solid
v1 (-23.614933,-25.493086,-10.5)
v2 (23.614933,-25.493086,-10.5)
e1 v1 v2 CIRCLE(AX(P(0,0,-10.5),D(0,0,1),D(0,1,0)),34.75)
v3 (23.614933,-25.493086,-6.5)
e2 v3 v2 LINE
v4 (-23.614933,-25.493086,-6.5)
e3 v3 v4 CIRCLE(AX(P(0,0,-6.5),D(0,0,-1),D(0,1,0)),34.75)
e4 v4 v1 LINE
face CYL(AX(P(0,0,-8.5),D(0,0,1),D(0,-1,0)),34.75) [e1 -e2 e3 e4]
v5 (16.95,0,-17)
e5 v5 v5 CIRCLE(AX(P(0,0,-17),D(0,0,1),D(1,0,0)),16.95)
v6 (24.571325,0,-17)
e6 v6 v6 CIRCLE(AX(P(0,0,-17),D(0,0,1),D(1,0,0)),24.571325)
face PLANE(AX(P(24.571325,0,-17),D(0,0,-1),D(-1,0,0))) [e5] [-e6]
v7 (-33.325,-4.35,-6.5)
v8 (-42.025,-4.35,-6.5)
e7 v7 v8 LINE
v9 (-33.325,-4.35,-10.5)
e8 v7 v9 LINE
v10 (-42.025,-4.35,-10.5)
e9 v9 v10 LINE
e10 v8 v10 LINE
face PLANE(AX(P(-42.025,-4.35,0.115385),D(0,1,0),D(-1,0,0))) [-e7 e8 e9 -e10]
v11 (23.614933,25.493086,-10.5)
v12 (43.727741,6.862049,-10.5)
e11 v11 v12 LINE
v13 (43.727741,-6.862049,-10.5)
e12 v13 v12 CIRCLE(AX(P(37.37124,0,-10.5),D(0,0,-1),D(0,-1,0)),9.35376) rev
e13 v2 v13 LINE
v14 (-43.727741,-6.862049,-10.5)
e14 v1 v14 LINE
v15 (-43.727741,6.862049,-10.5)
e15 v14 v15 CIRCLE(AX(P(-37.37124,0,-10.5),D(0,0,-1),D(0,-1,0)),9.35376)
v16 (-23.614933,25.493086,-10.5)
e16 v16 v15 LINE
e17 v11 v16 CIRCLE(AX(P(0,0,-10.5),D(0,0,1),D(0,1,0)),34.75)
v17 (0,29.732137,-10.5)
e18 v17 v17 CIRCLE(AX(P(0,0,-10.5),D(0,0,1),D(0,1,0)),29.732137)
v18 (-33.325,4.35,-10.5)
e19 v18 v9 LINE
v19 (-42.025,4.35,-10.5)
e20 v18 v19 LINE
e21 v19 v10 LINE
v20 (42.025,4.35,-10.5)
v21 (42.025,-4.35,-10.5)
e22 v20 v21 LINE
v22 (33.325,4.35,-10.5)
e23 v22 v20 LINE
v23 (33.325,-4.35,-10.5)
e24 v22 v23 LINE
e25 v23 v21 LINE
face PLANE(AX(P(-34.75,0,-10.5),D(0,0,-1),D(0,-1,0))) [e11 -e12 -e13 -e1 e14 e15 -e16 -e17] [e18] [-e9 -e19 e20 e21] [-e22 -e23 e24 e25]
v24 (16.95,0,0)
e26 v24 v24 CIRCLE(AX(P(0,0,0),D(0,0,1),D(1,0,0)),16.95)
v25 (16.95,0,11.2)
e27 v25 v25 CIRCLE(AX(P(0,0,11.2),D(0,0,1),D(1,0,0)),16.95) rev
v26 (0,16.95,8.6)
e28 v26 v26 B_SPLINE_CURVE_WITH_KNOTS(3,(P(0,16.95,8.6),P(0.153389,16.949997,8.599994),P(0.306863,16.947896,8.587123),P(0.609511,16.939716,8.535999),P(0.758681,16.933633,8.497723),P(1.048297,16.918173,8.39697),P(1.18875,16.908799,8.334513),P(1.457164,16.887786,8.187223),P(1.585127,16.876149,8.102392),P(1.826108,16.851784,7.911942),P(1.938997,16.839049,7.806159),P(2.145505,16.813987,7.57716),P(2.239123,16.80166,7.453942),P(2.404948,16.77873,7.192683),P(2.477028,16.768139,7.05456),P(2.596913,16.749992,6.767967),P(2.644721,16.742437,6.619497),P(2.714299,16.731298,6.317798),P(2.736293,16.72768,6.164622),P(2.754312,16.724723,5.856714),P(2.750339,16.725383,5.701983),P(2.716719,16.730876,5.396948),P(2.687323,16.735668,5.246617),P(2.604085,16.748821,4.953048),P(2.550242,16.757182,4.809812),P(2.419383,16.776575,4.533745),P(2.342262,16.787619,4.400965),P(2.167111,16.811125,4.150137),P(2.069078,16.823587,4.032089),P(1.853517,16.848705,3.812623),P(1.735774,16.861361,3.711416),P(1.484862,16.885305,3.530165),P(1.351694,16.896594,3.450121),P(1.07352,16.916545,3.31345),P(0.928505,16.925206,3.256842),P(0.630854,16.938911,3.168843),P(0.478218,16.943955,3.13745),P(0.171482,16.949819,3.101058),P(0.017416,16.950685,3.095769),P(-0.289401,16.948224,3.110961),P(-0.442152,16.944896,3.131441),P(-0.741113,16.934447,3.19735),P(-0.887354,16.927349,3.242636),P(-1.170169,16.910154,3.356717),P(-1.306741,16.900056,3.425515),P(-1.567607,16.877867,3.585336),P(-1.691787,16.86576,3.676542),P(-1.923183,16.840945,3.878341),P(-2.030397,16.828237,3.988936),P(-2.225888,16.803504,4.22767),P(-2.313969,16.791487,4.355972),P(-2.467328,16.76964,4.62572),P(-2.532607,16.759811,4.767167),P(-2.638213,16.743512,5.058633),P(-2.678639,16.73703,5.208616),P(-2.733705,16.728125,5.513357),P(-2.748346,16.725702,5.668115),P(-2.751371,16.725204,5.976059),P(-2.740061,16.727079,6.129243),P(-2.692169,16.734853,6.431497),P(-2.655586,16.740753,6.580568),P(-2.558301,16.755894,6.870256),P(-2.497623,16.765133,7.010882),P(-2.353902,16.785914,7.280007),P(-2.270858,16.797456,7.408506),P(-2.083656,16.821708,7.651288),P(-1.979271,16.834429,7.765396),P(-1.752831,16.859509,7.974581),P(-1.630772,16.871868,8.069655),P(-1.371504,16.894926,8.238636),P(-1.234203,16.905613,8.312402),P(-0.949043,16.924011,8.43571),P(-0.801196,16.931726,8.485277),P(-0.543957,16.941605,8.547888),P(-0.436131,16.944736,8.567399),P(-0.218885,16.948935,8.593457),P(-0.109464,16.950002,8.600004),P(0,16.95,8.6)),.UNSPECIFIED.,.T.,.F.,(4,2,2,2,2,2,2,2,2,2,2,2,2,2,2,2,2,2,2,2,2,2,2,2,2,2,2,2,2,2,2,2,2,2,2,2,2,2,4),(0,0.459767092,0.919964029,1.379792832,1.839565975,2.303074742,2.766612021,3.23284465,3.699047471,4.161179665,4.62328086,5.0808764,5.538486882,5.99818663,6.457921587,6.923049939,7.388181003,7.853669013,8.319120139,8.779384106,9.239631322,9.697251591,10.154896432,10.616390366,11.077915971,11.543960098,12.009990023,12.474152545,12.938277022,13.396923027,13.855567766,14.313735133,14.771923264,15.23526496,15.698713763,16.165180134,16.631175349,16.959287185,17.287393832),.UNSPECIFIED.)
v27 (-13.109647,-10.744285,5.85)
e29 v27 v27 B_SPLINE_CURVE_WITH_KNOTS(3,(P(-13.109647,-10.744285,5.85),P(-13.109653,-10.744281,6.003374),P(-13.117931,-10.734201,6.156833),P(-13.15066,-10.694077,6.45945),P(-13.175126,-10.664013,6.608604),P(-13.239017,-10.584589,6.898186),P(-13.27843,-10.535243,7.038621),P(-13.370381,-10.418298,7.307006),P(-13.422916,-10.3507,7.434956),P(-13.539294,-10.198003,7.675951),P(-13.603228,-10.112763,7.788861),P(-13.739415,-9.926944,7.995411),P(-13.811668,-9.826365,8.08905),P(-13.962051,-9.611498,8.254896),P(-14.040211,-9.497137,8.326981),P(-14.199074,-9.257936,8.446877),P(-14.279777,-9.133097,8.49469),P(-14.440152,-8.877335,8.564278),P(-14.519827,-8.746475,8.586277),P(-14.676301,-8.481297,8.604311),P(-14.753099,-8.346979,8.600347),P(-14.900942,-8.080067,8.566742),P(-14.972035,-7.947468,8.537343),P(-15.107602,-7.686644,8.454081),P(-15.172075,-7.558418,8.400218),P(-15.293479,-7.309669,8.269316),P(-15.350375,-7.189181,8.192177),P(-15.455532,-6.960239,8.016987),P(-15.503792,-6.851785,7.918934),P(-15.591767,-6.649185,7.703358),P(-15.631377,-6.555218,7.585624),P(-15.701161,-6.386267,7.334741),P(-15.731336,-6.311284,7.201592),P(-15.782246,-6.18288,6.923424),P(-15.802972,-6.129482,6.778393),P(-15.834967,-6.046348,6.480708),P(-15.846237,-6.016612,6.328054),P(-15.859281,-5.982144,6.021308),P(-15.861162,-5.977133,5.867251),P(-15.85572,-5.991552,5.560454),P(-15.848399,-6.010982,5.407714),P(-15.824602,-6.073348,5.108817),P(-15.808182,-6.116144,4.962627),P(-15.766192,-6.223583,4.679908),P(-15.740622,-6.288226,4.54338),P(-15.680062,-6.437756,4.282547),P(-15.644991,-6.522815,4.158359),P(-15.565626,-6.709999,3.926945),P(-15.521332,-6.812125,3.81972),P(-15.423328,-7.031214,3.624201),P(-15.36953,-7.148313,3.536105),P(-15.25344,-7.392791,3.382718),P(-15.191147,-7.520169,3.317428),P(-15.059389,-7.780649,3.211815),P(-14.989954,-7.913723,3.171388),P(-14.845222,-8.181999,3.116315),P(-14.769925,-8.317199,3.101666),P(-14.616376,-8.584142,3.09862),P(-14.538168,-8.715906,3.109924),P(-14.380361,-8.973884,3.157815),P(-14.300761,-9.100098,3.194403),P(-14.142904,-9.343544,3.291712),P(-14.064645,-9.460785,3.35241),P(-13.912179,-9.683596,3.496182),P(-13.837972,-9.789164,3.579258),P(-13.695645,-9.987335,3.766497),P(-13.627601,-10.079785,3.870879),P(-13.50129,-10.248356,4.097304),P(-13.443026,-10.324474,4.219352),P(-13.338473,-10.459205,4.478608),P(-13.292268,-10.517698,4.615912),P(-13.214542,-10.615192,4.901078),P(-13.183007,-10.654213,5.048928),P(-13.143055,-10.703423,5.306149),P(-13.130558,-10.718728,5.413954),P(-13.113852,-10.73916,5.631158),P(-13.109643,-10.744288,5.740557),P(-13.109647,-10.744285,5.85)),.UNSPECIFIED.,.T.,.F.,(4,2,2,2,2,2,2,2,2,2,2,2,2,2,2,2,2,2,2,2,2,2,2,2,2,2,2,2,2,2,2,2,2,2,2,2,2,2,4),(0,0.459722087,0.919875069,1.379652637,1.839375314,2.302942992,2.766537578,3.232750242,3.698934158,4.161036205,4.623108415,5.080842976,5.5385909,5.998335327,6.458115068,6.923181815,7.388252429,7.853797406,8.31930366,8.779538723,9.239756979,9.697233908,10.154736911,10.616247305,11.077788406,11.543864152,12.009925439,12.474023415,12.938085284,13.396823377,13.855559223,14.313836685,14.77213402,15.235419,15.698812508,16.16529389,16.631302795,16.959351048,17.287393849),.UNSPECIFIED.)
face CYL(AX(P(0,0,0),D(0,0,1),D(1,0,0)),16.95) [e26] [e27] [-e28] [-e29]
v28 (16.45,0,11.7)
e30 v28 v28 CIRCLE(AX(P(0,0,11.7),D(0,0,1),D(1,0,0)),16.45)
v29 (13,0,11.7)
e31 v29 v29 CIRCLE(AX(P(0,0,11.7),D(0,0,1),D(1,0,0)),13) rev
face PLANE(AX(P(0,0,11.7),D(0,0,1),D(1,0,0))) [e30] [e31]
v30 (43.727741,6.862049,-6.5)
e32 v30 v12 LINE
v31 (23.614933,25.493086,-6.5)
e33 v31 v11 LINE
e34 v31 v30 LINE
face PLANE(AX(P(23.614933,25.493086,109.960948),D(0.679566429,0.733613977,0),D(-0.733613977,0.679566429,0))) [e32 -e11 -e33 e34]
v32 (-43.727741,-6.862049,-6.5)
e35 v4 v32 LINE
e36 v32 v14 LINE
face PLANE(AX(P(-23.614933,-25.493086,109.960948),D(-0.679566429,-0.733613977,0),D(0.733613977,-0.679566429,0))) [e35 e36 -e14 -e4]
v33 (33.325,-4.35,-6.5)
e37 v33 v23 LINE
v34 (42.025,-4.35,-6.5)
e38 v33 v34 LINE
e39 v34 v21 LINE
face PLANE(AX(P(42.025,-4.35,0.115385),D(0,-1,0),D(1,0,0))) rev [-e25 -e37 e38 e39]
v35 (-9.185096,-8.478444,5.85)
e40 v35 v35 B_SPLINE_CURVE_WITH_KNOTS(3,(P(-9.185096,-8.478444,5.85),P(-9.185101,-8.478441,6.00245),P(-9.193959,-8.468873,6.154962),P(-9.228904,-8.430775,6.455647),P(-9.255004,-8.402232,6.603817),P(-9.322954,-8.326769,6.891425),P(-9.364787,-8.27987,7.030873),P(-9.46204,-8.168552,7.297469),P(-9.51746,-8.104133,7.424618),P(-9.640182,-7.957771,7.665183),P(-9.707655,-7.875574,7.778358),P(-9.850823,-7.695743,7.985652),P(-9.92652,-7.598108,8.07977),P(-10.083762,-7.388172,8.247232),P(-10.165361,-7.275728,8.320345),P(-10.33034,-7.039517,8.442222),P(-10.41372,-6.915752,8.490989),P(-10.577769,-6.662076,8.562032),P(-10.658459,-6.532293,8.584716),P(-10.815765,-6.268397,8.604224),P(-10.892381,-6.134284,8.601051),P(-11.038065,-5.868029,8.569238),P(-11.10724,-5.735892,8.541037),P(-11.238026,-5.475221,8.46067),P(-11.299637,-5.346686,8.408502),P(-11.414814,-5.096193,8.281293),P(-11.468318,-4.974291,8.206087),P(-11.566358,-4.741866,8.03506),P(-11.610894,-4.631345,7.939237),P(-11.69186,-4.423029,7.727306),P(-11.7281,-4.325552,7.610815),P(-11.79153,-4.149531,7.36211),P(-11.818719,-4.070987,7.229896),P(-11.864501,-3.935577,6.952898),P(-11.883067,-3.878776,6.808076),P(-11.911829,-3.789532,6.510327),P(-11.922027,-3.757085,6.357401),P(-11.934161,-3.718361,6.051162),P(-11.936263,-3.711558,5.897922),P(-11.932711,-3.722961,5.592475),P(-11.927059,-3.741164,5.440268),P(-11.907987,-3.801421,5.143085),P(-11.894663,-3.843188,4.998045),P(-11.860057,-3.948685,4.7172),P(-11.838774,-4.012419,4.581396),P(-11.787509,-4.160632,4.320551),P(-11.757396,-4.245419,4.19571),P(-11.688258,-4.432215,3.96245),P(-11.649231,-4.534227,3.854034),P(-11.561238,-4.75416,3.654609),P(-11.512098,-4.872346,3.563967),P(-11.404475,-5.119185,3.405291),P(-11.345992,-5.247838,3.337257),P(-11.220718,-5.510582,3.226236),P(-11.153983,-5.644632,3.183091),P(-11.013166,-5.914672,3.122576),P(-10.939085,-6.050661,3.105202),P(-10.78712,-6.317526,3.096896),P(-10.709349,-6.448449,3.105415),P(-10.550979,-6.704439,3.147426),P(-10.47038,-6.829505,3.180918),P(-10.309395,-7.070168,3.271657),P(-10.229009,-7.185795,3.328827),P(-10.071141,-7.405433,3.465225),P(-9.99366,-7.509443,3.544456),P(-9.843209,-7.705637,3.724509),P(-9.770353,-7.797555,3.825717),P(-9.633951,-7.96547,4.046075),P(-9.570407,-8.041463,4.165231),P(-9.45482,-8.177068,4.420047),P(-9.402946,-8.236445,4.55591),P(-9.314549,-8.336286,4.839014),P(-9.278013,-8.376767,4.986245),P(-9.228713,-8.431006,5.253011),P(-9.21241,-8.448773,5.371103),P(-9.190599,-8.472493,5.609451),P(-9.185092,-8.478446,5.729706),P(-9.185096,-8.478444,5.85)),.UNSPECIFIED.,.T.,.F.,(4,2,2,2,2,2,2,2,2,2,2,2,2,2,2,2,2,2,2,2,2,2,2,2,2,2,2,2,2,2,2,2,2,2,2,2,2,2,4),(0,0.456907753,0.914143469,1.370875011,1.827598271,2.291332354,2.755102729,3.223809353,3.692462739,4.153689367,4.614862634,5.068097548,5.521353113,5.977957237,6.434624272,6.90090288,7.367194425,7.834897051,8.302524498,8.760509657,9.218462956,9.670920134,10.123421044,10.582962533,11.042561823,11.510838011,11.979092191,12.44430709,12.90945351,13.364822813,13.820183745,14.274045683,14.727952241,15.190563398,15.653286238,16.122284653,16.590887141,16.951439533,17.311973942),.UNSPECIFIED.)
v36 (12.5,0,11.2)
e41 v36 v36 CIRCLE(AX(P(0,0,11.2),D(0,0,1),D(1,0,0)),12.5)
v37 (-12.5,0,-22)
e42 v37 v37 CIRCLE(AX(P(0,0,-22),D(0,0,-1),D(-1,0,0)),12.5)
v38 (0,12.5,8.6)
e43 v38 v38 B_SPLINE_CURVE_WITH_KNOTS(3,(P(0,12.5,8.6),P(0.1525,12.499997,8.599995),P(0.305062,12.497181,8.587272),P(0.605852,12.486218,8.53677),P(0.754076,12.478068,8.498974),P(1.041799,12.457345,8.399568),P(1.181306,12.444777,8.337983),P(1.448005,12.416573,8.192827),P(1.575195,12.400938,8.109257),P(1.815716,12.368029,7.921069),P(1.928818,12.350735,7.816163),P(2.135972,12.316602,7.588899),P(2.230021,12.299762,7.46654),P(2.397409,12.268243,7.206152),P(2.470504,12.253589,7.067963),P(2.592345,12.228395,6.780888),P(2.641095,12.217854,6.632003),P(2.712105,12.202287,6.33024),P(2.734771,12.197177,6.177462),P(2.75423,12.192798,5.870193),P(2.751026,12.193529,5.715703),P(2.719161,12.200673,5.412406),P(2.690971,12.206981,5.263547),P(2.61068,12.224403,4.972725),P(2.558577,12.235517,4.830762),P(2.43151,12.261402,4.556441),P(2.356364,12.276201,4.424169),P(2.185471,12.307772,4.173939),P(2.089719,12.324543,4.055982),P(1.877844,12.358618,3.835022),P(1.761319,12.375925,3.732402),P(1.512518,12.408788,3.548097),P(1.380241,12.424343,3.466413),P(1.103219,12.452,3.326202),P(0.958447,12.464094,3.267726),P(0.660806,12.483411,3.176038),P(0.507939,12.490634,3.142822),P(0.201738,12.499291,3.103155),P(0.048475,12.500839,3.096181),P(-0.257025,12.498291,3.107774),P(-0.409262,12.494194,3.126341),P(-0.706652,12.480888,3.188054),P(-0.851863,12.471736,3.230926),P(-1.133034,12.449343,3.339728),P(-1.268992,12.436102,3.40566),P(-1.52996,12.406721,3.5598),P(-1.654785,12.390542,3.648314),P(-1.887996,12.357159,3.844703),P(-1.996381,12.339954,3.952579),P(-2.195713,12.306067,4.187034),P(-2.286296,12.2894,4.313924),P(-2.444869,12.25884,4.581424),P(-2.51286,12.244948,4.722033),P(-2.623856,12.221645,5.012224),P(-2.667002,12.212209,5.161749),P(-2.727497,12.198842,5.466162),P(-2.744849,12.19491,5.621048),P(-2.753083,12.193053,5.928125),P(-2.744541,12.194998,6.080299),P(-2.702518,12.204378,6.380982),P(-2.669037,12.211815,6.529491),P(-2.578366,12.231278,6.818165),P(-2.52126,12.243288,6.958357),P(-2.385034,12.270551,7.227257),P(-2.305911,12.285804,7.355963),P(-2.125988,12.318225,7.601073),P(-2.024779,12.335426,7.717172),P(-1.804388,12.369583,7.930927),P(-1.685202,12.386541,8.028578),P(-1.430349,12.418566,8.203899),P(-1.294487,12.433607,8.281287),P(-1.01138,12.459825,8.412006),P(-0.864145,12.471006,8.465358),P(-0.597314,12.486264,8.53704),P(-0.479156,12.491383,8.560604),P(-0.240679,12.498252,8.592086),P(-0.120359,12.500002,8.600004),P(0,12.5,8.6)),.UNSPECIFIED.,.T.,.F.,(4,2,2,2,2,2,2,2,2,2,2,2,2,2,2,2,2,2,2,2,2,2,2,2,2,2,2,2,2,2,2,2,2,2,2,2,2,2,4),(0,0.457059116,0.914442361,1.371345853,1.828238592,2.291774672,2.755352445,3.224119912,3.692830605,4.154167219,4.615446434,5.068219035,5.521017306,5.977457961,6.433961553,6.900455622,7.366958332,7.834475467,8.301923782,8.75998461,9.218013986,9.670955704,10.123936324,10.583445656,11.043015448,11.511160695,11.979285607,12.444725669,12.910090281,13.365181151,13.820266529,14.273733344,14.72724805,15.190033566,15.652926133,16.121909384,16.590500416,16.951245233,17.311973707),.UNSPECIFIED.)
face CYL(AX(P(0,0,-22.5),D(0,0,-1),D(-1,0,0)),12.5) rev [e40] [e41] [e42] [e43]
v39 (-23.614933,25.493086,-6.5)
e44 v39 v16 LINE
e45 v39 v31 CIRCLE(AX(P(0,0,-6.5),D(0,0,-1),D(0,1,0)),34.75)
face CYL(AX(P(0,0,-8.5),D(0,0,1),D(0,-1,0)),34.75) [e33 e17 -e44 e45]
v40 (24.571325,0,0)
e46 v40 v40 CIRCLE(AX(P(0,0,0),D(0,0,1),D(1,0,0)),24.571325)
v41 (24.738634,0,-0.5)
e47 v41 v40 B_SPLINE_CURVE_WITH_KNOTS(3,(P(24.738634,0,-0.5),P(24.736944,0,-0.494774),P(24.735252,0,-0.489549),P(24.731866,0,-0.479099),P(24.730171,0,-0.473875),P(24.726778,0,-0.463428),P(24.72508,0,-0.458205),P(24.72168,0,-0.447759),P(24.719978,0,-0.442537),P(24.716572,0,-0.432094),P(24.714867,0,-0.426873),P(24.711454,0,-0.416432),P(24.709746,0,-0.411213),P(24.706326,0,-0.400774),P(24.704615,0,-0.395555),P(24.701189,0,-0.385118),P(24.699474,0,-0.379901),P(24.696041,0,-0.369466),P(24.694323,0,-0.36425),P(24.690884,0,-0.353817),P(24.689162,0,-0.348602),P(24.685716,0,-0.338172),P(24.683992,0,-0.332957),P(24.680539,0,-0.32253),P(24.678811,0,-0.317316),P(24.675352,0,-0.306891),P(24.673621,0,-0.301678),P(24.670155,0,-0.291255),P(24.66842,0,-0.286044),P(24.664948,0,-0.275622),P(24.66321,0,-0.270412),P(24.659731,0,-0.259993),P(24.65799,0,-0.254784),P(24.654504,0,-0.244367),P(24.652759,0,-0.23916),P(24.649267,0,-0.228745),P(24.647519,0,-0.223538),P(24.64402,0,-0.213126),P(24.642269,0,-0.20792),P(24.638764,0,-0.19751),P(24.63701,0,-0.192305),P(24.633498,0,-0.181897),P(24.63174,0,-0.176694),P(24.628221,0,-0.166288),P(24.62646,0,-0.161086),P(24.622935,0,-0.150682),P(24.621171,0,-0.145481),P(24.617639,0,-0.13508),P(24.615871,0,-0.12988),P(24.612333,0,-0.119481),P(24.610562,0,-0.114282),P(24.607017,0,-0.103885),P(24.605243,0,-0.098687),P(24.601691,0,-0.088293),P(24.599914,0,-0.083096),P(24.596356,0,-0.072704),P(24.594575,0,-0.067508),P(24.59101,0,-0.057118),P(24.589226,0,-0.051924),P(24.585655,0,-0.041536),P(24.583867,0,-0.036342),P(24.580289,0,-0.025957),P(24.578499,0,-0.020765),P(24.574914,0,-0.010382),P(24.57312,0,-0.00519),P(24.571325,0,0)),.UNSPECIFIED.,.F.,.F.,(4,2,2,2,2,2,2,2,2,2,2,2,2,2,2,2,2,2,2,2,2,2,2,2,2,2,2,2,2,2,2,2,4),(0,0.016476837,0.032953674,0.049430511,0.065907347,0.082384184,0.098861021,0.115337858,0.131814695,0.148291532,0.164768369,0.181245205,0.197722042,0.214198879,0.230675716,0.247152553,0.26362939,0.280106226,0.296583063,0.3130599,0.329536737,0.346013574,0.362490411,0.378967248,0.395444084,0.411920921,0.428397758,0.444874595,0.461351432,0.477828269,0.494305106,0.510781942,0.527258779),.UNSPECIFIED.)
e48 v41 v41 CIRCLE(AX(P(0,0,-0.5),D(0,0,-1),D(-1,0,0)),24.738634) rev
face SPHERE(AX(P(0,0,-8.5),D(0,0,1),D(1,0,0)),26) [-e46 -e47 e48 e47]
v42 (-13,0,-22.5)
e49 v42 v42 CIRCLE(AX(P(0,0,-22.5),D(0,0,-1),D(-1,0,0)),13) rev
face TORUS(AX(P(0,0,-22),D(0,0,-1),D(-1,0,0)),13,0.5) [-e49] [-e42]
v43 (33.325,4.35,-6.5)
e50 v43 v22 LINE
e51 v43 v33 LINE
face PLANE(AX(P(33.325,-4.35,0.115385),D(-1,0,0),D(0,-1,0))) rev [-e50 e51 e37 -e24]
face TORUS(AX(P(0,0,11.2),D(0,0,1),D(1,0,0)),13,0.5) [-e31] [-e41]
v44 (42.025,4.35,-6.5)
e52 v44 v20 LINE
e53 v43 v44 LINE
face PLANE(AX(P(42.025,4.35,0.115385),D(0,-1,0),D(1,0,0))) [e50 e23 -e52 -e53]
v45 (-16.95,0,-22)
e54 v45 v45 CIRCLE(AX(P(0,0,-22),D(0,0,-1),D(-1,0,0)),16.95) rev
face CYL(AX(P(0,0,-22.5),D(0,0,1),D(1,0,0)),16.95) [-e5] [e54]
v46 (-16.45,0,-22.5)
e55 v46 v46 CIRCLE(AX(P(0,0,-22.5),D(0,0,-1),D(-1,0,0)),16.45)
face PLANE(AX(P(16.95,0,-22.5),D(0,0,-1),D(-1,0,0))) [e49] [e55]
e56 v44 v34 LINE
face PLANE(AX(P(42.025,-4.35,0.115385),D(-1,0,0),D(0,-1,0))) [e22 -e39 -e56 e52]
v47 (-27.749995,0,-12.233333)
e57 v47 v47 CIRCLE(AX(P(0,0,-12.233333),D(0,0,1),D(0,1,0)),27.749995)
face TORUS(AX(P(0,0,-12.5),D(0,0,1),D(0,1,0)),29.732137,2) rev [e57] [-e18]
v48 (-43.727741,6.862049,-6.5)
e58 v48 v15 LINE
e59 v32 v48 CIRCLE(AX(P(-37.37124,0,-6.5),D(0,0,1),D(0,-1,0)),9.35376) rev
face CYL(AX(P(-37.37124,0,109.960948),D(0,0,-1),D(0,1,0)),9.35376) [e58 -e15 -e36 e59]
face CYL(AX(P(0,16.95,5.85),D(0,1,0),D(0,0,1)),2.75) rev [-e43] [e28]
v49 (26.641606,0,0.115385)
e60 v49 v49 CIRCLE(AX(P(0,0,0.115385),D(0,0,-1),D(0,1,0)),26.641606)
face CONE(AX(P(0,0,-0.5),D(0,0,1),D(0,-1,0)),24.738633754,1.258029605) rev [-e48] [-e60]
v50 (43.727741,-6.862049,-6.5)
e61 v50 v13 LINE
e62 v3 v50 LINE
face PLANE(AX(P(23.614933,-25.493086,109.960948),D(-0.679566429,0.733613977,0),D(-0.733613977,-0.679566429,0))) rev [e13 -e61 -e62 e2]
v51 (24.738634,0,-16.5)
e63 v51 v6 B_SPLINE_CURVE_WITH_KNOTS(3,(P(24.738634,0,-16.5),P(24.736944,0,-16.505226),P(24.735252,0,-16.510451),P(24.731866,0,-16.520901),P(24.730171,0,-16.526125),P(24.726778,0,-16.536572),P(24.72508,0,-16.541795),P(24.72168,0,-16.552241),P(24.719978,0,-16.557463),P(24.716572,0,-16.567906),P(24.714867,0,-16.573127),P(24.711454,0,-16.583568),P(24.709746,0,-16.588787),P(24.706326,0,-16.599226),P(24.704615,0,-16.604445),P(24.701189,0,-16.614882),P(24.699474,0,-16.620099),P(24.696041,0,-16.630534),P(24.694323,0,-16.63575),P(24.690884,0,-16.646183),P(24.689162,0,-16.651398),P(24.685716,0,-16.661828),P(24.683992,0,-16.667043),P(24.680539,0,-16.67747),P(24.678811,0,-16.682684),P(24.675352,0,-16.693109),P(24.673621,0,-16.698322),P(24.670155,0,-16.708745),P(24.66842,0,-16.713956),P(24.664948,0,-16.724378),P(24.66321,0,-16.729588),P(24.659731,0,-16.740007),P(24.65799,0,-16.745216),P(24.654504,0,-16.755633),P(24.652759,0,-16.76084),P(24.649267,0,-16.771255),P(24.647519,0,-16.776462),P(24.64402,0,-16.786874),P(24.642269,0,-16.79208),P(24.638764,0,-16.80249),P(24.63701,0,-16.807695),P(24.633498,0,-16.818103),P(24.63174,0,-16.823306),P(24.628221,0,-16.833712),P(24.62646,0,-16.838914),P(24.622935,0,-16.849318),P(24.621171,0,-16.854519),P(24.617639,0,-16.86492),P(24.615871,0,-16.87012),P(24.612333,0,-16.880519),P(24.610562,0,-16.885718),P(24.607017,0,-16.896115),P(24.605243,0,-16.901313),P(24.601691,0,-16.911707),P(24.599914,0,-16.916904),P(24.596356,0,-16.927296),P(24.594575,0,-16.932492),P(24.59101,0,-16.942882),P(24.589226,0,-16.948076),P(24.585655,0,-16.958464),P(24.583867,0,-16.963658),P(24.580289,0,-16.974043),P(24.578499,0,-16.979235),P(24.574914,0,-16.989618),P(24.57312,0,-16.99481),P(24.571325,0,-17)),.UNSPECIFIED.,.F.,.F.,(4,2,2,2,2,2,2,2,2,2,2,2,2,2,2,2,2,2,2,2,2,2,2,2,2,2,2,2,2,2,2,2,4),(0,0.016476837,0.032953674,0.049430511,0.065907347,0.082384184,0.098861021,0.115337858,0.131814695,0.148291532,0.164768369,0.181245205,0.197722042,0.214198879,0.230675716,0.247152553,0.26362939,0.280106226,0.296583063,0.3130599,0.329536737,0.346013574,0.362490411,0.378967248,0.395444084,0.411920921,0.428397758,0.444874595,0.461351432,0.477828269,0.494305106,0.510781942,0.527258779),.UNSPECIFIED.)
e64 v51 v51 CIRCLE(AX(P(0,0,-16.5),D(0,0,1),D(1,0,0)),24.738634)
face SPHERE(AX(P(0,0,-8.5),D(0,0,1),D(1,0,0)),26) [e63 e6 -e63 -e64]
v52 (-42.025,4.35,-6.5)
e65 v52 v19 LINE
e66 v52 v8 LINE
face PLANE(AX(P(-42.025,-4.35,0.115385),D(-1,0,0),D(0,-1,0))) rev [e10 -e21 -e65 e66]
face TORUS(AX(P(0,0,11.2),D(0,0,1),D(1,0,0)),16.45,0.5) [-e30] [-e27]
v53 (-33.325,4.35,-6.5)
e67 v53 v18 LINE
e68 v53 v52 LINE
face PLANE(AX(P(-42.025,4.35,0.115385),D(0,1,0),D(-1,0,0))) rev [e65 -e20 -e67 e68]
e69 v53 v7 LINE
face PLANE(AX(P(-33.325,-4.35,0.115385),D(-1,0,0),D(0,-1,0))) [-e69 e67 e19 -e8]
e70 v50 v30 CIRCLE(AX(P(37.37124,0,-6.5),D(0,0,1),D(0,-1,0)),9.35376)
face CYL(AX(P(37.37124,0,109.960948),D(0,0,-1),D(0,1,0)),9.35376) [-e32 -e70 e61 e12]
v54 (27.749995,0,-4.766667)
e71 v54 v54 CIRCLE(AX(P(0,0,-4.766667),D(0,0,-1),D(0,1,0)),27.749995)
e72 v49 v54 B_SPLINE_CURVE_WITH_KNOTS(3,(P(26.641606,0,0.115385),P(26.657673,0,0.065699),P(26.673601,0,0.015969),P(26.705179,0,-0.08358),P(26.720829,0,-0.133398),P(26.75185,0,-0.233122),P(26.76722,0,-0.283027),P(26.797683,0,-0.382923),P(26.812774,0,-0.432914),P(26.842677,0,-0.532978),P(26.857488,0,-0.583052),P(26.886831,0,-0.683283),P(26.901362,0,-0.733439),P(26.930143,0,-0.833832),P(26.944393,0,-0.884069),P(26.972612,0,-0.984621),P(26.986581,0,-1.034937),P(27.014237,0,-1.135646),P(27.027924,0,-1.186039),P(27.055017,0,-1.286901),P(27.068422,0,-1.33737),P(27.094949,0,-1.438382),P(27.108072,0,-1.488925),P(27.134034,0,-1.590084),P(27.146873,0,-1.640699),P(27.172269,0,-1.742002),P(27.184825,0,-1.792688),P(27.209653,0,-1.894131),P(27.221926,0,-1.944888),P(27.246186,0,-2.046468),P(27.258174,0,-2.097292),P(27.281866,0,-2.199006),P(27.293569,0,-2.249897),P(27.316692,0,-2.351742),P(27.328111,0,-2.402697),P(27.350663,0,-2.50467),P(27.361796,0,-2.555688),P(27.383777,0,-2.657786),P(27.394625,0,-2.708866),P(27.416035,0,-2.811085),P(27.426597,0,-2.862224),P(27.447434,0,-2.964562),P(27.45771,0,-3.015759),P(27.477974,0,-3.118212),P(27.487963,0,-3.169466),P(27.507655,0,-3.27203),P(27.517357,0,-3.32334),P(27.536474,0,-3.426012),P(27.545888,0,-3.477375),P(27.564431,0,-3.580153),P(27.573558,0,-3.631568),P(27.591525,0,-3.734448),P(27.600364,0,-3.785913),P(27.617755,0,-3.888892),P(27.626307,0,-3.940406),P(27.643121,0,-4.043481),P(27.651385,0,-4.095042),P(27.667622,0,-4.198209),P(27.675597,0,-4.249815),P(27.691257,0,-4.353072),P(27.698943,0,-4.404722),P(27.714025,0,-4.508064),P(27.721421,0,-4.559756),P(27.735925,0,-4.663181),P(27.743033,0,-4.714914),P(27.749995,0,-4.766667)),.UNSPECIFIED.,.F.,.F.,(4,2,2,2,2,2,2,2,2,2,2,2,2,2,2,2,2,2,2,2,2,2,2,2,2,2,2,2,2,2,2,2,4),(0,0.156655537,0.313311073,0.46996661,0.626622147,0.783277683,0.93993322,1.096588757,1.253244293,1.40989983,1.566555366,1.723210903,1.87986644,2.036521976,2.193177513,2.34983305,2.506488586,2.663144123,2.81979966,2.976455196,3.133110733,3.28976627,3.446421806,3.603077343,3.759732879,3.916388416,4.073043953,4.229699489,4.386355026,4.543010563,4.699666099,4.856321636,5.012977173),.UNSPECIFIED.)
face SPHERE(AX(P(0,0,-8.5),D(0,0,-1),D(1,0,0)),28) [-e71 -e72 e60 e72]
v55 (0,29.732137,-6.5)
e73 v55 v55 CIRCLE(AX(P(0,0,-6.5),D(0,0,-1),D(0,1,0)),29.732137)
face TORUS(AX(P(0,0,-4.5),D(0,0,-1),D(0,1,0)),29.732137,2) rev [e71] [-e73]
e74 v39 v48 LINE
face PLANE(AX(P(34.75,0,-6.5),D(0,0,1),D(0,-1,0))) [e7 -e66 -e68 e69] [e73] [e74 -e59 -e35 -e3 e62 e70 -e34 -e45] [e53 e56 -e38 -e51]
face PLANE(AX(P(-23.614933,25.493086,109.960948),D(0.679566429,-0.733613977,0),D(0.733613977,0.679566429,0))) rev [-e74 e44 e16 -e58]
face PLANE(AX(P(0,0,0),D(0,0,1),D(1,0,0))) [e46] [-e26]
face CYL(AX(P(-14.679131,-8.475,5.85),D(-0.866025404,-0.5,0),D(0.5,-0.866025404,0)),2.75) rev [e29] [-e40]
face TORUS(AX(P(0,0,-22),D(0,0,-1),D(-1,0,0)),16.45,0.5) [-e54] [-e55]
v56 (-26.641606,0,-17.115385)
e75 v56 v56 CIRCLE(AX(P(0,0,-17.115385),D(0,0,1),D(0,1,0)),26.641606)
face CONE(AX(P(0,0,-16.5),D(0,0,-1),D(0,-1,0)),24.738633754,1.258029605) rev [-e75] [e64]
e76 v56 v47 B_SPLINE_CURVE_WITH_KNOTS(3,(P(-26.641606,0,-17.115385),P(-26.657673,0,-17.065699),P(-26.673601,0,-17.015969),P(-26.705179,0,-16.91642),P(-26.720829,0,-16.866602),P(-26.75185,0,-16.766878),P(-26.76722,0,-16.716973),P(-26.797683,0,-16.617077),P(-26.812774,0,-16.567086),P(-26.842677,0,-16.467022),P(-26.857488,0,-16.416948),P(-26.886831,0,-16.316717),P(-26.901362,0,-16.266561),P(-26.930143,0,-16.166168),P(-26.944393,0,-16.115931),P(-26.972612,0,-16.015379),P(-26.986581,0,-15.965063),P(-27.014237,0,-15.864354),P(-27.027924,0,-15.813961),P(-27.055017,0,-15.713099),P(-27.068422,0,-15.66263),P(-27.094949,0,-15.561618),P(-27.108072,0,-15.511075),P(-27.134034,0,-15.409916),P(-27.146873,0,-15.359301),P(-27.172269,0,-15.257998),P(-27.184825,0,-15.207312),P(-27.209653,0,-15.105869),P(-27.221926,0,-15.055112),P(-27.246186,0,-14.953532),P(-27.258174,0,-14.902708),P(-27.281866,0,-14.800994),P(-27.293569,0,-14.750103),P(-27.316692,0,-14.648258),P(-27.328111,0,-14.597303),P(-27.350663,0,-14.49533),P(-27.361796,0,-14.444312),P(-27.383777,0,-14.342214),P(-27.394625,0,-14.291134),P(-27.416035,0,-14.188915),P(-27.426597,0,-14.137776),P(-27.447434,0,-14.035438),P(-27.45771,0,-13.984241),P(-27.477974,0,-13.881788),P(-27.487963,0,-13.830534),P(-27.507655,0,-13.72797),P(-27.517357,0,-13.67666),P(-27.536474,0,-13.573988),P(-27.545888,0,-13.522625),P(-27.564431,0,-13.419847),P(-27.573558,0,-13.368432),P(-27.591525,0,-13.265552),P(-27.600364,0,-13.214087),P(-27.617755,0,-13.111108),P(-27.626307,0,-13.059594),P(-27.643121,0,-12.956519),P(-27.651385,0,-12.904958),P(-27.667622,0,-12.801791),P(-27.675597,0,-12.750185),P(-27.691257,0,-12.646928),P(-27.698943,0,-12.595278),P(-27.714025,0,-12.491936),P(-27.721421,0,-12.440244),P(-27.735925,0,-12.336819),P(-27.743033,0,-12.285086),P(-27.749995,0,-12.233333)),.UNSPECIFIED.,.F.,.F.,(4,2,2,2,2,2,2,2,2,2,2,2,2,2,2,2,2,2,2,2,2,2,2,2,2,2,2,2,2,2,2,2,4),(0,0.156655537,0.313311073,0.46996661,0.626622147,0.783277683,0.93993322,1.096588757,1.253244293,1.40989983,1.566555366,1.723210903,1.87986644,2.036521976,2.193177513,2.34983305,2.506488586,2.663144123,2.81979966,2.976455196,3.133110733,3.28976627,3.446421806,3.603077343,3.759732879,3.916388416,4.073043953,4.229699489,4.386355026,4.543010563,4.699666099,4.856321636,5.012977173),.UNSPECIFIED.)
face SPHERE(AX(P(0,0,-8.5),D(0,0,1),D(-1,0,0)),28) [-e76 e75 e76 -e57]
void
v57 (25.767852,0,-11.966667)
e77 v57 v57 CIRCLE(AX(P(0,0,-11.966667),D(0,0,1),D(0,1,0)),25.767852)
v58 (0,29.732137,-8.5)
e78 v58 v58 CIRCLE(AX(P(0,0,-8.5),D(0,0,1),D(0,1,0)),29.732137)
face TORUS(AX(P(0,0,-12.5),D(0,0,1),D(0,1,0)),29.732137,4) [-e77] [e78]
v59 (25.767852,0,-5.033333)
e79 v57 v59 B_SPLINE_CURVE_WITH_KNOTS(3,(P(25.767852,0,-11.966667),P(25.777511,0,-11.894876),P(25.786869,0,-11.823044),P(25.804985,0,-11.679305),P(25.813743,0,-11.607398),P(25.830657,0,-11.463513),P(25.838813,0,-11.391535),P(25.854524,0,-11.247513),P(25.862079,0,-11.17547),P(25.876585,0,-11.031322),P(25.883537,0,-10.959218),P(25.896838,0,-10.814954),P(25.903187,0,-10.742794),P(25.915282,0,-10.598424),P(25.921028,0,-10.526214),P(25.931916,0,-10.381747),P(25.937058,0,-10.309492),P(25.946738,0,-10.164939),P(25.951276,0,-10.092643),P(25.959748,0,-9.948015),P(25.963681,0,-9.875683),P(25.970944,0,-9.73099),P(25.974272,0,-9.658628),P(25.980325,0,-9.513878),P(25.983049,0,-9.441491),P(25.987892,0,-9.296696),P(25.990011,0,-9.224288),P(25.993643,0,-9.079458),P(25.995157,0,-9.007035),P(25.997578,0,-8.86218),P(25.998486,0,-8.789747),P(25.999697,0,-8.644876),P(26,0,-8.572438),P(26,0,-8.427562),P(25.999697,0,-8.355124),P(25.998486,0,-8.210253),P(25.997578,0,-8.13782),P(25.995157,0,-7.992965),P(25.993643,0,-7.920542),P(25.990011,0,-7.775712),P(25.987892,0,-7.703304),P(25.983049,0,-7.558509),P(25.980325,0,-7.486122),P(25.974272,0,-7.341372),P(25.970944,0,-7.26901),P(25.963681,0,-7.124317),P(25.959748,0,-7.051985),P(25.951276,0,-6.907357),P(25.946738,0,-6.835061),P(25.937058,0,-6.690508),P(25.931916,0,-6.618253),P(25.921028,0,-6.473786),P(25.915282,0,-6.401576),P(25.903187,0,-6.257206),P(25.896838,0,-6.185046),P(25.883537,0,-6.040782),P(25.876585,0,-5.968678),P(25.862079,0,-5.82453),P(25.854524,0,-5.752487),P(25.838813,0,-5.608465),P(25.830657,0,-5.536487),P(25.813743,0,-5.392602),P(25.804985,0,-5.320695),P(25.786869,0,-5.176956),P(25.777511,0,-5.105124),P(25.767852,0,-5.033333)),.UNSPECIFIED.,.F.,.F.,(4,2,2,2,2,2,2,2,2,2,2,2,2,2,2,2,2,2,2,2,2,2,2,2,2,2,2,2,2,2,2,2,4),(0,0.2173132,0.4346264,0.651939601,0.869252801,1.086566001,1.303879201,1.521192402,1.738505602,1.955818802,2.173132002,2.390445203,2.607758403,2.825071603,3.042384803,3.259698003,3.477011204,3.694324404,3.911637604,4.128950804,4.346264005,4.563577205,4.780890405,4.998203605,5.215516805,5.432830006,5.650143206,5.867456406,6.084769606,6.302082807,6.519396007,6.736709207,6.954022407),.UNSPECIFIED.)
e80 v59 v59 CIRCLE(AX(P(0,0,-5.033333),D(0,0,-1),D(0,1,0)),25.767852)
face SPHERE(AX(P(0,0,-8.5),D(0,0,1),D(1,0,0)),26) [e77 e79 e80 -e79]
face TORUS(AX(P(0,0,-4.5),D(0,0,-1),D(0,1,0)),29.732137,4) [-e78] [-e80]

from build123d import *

# Parameters (mm, degrees)
SKETCH_2_W                   = 16.95
SKETCH_2_H                   = 5.5
SKETCH_3_W                   = 16.95
SKETCH_3_H                   = 11.7
HOLE_WIZARD_25_0_25_1_D      = 25
HOLE_WIZARD_5_5_5_5_1_REACH  = 62.391
HOLE_WIZARD_5_5_5_5_1_BORE_R = 2.75
HOLE_WIZARD_5_5_5_5_2_REACH  = 59.658
HOLE_WIZARD_5_5_5_5_2_BORE_R = 2.75
FILLET_1_R                   = 0.5
COMBINE_START                = -10.5
COMBINE_1_2_OUTLINE_W        = 8.7
COMBINE_1_2_OUTLINE_H        = 8.7
COMBINE_1_2_OUTLINE_R        = 29.732137495
COMBINE_1_2_DEPTH            = 4


with BuildPart() as part:
    # Эскиз1 → Повернуть1 (revolve)
    with BuildSketch(Plane(origin=(0, 0, 0), x_dir=(1, 0, 0), z_dir=(0, 1, 0))):
        with BuildLine():
            Line((24.571324751, 17), (0, 17))
            Line((0, 17), (0, 0))
            Line((0, 0), (24.571324751, 0))
            ThreePointArc((24.571324751, 0), (26, 8.5), (24.571324751, 17))
        make_face()
    revolve(axis=Axis((0, 0, -17), (0, 0, 1)))

    # Эскиз2 → Повернуть2 (revolve)
    with BuildSketch(Plane(origin=(0, 0, 0), x_dir=(1, 0, 0), z_dir=(0, 1, 0))):
        with Locations((8.475, 19.75)):
            Rectangle(SKETCH_2_W, SKETCH_2_H)
    revolve(axis=Axis((0, 0, -22.5), (0, 0, 1)))

    # Эскиз3 → Повернуть3 (revolve)
    with BuildSketch(Plane(origin=(0, 0, 0), x_dir=(1, 0, 0), z_dir=(0, 1, 0))):
        with Locations((8.475, -5.85)):
            Rectangle(SKETCH_3_W, SKETCH_3_H)
    revolve(axis=Axis((0, 0, 0), (0, 0, 1)))

    # Диаметр отверстия Ø25.0 (25)1 (through all)
    with Locations(Plane(origin=(0, 0, -22.5), x_dir=(-1, 0, 0), z_dir=(0, 0, -1))):
        with Locations((0, 0)):
            Hole(HOLE_WIZARD_25_0_25_1_D / 2)

    # Диаметр отверстия Ø5.5 (5.5)1 bore (on position points) → Диаметр отверстия Ø5.5 (5.5)1 (cut, up to next)
    with BuildSketch(Plane(origin=(-14.679130594, -8.475, 5.85), x_dir=(0.5, -0.866025403784, 0), z_dir=(-0.866025403784, -0.5, 0)), mode=Mode.PRIVATE) as hole_wizard_5_5_5_5_1_sk1:
        Circle(HOLE_WIZARD_5_5_5_5_1_BORE_R)
    hole_wizard_5_5_5_5_1_tool1 = extrude(hole_wizard_5_5_5_5_1_sk1.sketch, amount=-HOLE_WIZARD_5_5_5_5_1_REACH, mode=Mode.PRIVATE) & part.part
    add(hole_wizard_5_5_5_5_1_tool1.solids().sort_by_distance((-14.679131, -8.475, 5.85))[0], mode=Mode.SUBTRACT)

    # Диаметр отверстия Ø5.5 (5.5)2 bore (on position points) → Диаметр отверстия Ø5.5 (5.5)2 (cut, up to next)
    with BuildSketch(Plane(origin=(0, 16.95, 5.85), x_dir=(1, 0, 0), z_dir=(0, 1, 0)), mode=Mode.PRIVATE) as hole_wizard_5_5_5_5_2_sk1:
        Circle(HOLE_WIZARD_5_5_5_5_2_BORE_R)
    hole_wizard_5_5_5_5_2_tool1 = extrude(hole_wizard_5_5_5_5_2_sk1.sketch, amount=-HOLE_WIZARD_5_5_5_5_2_REACH, mode=Mode.PRIVATE) & part.part
    add(hole_wizard_5_5_5_5_2_tool1.solids().sort_by_distance((0, 16.95, 5.85))[0], mode=Mode.SUBTRACT)

    # Скругление1
    fillet_1_edges = [part.edges().sort_by_distance(p)[0] for p in [
        (-16.95, 0, 11.7),
        (-12.5, 0, -22.5),
        (-12.5, 0, 11.7),
        (-16.95, 0, -22.5),
    ]]
    fillet(fillet_1_edges, radius=FILLET_1_R)

    # Combine 1: read off the stored shape, not the designer's step
    # Combine 1 outline → Combine 1 (revolve)
    with BuildSketch(Plane.XZ):
        with BuildLine():
            ThreePointArc((29.732137495, -8.5), (27.09901514, -9.488909389), (25.767852495, -11.966666667))
            Line((25.767852495, -11.966666667), (24.738633754, -11.966666667))
            Line((24.738633754, -11.966666667), (24.738633754, -16.5))
            Line((24.738633754, -16.5), (26.641605576, -17.115384628))
            ThreePointArc((26.641605576, -17.115384628), (27.305130644, -14.699180633), (27.749994997, -12.23333332))
            ThreePointArc((27.749994997, -12.23333332), (28.415576323, -10.99445469), (29.732137495, -10.5))
            Line((29.732137495, -10.5), (29.732137495, -8.5))
        make_face()
        with BuildLine():
            ThreePointArc((25.767852495, -5.033333333), (27.09901514, -7.511090611), (29.732137495, -8.5))
            Line((29.732137495, -8.5), (29.732137495, -6.5))
            ThreePointArc((29.732137495, -6.5), (28.415576323, -6.00554531), (27.749994997, -4.766666681))
            ThreePointArc((27.749994997, -4.766666681), (27.305130644, -2.300819367), (26.641605576, 0.115384628))
            Line((26.641605576, 0.115384628), (24.738633754, -0.5))
            Line((24.738633754, -0.5), (24.738633754, -5.033333333))
            Line((24.738633754, -5.033333333), (25.767852495, -5.033333333))
        make_face()
    revolve(axis=Axis((0, 0, 0), (0, 0, 1)))

    # Combine 1 2 outline → Combine 1 2 (add)
    with BuildSketch(Plane.XY.offset(COMBINE_START)):
        with BuildLine():
            Line((-43.727741416, -6.862048778), (-23.614933424, -25.493085717))
            ThreePointArc((-23.614933424, -25.493085717), (0, -34.75), (23.614933424, -25.493085717))
            Line((23.614933424, -25.493085717), (43.727741416, -6.862048778))
            ThreePointArc((43.727741416, -6.862048778), (46.725, 0), (43.727741416, 6.862048778))
            Line((43.727741416, 6.862048778), (23.614933424, 25.493085717))
            ThreePointArc((23.614933424, 25.493085717), (0, 34.75), (-23.614933424, 25.493085717))
            Line((-23.614933424, 25.493085717), (-43.727741416, 6.862048778))
            ThreePointArc((-43.727741416, 6.862048778), (-46.725, 0), (-43.727741416, -6.862048778))
        make_face()
        with Locations((-37.675, 0)):
            Rectangle(COMBINE_1_2_OUTLINE_W, COMBINE_1_2_OUTLINE_H, mode=Mode.SUBTRACT)
        Circle(COMBINE_1_2_OUTLINE_R, mode=Mode.SUBTRACT)
        with Locations((37.675, 0)):
            Rectangle(COMBINE_1_2_OUTLINE_W, COMBINE_1_2_OUTLINE_H, mode=Mode.SUBTRACT)
    extrude(amount=COMBINE_1_2_DEPTH)


solid = part.part
